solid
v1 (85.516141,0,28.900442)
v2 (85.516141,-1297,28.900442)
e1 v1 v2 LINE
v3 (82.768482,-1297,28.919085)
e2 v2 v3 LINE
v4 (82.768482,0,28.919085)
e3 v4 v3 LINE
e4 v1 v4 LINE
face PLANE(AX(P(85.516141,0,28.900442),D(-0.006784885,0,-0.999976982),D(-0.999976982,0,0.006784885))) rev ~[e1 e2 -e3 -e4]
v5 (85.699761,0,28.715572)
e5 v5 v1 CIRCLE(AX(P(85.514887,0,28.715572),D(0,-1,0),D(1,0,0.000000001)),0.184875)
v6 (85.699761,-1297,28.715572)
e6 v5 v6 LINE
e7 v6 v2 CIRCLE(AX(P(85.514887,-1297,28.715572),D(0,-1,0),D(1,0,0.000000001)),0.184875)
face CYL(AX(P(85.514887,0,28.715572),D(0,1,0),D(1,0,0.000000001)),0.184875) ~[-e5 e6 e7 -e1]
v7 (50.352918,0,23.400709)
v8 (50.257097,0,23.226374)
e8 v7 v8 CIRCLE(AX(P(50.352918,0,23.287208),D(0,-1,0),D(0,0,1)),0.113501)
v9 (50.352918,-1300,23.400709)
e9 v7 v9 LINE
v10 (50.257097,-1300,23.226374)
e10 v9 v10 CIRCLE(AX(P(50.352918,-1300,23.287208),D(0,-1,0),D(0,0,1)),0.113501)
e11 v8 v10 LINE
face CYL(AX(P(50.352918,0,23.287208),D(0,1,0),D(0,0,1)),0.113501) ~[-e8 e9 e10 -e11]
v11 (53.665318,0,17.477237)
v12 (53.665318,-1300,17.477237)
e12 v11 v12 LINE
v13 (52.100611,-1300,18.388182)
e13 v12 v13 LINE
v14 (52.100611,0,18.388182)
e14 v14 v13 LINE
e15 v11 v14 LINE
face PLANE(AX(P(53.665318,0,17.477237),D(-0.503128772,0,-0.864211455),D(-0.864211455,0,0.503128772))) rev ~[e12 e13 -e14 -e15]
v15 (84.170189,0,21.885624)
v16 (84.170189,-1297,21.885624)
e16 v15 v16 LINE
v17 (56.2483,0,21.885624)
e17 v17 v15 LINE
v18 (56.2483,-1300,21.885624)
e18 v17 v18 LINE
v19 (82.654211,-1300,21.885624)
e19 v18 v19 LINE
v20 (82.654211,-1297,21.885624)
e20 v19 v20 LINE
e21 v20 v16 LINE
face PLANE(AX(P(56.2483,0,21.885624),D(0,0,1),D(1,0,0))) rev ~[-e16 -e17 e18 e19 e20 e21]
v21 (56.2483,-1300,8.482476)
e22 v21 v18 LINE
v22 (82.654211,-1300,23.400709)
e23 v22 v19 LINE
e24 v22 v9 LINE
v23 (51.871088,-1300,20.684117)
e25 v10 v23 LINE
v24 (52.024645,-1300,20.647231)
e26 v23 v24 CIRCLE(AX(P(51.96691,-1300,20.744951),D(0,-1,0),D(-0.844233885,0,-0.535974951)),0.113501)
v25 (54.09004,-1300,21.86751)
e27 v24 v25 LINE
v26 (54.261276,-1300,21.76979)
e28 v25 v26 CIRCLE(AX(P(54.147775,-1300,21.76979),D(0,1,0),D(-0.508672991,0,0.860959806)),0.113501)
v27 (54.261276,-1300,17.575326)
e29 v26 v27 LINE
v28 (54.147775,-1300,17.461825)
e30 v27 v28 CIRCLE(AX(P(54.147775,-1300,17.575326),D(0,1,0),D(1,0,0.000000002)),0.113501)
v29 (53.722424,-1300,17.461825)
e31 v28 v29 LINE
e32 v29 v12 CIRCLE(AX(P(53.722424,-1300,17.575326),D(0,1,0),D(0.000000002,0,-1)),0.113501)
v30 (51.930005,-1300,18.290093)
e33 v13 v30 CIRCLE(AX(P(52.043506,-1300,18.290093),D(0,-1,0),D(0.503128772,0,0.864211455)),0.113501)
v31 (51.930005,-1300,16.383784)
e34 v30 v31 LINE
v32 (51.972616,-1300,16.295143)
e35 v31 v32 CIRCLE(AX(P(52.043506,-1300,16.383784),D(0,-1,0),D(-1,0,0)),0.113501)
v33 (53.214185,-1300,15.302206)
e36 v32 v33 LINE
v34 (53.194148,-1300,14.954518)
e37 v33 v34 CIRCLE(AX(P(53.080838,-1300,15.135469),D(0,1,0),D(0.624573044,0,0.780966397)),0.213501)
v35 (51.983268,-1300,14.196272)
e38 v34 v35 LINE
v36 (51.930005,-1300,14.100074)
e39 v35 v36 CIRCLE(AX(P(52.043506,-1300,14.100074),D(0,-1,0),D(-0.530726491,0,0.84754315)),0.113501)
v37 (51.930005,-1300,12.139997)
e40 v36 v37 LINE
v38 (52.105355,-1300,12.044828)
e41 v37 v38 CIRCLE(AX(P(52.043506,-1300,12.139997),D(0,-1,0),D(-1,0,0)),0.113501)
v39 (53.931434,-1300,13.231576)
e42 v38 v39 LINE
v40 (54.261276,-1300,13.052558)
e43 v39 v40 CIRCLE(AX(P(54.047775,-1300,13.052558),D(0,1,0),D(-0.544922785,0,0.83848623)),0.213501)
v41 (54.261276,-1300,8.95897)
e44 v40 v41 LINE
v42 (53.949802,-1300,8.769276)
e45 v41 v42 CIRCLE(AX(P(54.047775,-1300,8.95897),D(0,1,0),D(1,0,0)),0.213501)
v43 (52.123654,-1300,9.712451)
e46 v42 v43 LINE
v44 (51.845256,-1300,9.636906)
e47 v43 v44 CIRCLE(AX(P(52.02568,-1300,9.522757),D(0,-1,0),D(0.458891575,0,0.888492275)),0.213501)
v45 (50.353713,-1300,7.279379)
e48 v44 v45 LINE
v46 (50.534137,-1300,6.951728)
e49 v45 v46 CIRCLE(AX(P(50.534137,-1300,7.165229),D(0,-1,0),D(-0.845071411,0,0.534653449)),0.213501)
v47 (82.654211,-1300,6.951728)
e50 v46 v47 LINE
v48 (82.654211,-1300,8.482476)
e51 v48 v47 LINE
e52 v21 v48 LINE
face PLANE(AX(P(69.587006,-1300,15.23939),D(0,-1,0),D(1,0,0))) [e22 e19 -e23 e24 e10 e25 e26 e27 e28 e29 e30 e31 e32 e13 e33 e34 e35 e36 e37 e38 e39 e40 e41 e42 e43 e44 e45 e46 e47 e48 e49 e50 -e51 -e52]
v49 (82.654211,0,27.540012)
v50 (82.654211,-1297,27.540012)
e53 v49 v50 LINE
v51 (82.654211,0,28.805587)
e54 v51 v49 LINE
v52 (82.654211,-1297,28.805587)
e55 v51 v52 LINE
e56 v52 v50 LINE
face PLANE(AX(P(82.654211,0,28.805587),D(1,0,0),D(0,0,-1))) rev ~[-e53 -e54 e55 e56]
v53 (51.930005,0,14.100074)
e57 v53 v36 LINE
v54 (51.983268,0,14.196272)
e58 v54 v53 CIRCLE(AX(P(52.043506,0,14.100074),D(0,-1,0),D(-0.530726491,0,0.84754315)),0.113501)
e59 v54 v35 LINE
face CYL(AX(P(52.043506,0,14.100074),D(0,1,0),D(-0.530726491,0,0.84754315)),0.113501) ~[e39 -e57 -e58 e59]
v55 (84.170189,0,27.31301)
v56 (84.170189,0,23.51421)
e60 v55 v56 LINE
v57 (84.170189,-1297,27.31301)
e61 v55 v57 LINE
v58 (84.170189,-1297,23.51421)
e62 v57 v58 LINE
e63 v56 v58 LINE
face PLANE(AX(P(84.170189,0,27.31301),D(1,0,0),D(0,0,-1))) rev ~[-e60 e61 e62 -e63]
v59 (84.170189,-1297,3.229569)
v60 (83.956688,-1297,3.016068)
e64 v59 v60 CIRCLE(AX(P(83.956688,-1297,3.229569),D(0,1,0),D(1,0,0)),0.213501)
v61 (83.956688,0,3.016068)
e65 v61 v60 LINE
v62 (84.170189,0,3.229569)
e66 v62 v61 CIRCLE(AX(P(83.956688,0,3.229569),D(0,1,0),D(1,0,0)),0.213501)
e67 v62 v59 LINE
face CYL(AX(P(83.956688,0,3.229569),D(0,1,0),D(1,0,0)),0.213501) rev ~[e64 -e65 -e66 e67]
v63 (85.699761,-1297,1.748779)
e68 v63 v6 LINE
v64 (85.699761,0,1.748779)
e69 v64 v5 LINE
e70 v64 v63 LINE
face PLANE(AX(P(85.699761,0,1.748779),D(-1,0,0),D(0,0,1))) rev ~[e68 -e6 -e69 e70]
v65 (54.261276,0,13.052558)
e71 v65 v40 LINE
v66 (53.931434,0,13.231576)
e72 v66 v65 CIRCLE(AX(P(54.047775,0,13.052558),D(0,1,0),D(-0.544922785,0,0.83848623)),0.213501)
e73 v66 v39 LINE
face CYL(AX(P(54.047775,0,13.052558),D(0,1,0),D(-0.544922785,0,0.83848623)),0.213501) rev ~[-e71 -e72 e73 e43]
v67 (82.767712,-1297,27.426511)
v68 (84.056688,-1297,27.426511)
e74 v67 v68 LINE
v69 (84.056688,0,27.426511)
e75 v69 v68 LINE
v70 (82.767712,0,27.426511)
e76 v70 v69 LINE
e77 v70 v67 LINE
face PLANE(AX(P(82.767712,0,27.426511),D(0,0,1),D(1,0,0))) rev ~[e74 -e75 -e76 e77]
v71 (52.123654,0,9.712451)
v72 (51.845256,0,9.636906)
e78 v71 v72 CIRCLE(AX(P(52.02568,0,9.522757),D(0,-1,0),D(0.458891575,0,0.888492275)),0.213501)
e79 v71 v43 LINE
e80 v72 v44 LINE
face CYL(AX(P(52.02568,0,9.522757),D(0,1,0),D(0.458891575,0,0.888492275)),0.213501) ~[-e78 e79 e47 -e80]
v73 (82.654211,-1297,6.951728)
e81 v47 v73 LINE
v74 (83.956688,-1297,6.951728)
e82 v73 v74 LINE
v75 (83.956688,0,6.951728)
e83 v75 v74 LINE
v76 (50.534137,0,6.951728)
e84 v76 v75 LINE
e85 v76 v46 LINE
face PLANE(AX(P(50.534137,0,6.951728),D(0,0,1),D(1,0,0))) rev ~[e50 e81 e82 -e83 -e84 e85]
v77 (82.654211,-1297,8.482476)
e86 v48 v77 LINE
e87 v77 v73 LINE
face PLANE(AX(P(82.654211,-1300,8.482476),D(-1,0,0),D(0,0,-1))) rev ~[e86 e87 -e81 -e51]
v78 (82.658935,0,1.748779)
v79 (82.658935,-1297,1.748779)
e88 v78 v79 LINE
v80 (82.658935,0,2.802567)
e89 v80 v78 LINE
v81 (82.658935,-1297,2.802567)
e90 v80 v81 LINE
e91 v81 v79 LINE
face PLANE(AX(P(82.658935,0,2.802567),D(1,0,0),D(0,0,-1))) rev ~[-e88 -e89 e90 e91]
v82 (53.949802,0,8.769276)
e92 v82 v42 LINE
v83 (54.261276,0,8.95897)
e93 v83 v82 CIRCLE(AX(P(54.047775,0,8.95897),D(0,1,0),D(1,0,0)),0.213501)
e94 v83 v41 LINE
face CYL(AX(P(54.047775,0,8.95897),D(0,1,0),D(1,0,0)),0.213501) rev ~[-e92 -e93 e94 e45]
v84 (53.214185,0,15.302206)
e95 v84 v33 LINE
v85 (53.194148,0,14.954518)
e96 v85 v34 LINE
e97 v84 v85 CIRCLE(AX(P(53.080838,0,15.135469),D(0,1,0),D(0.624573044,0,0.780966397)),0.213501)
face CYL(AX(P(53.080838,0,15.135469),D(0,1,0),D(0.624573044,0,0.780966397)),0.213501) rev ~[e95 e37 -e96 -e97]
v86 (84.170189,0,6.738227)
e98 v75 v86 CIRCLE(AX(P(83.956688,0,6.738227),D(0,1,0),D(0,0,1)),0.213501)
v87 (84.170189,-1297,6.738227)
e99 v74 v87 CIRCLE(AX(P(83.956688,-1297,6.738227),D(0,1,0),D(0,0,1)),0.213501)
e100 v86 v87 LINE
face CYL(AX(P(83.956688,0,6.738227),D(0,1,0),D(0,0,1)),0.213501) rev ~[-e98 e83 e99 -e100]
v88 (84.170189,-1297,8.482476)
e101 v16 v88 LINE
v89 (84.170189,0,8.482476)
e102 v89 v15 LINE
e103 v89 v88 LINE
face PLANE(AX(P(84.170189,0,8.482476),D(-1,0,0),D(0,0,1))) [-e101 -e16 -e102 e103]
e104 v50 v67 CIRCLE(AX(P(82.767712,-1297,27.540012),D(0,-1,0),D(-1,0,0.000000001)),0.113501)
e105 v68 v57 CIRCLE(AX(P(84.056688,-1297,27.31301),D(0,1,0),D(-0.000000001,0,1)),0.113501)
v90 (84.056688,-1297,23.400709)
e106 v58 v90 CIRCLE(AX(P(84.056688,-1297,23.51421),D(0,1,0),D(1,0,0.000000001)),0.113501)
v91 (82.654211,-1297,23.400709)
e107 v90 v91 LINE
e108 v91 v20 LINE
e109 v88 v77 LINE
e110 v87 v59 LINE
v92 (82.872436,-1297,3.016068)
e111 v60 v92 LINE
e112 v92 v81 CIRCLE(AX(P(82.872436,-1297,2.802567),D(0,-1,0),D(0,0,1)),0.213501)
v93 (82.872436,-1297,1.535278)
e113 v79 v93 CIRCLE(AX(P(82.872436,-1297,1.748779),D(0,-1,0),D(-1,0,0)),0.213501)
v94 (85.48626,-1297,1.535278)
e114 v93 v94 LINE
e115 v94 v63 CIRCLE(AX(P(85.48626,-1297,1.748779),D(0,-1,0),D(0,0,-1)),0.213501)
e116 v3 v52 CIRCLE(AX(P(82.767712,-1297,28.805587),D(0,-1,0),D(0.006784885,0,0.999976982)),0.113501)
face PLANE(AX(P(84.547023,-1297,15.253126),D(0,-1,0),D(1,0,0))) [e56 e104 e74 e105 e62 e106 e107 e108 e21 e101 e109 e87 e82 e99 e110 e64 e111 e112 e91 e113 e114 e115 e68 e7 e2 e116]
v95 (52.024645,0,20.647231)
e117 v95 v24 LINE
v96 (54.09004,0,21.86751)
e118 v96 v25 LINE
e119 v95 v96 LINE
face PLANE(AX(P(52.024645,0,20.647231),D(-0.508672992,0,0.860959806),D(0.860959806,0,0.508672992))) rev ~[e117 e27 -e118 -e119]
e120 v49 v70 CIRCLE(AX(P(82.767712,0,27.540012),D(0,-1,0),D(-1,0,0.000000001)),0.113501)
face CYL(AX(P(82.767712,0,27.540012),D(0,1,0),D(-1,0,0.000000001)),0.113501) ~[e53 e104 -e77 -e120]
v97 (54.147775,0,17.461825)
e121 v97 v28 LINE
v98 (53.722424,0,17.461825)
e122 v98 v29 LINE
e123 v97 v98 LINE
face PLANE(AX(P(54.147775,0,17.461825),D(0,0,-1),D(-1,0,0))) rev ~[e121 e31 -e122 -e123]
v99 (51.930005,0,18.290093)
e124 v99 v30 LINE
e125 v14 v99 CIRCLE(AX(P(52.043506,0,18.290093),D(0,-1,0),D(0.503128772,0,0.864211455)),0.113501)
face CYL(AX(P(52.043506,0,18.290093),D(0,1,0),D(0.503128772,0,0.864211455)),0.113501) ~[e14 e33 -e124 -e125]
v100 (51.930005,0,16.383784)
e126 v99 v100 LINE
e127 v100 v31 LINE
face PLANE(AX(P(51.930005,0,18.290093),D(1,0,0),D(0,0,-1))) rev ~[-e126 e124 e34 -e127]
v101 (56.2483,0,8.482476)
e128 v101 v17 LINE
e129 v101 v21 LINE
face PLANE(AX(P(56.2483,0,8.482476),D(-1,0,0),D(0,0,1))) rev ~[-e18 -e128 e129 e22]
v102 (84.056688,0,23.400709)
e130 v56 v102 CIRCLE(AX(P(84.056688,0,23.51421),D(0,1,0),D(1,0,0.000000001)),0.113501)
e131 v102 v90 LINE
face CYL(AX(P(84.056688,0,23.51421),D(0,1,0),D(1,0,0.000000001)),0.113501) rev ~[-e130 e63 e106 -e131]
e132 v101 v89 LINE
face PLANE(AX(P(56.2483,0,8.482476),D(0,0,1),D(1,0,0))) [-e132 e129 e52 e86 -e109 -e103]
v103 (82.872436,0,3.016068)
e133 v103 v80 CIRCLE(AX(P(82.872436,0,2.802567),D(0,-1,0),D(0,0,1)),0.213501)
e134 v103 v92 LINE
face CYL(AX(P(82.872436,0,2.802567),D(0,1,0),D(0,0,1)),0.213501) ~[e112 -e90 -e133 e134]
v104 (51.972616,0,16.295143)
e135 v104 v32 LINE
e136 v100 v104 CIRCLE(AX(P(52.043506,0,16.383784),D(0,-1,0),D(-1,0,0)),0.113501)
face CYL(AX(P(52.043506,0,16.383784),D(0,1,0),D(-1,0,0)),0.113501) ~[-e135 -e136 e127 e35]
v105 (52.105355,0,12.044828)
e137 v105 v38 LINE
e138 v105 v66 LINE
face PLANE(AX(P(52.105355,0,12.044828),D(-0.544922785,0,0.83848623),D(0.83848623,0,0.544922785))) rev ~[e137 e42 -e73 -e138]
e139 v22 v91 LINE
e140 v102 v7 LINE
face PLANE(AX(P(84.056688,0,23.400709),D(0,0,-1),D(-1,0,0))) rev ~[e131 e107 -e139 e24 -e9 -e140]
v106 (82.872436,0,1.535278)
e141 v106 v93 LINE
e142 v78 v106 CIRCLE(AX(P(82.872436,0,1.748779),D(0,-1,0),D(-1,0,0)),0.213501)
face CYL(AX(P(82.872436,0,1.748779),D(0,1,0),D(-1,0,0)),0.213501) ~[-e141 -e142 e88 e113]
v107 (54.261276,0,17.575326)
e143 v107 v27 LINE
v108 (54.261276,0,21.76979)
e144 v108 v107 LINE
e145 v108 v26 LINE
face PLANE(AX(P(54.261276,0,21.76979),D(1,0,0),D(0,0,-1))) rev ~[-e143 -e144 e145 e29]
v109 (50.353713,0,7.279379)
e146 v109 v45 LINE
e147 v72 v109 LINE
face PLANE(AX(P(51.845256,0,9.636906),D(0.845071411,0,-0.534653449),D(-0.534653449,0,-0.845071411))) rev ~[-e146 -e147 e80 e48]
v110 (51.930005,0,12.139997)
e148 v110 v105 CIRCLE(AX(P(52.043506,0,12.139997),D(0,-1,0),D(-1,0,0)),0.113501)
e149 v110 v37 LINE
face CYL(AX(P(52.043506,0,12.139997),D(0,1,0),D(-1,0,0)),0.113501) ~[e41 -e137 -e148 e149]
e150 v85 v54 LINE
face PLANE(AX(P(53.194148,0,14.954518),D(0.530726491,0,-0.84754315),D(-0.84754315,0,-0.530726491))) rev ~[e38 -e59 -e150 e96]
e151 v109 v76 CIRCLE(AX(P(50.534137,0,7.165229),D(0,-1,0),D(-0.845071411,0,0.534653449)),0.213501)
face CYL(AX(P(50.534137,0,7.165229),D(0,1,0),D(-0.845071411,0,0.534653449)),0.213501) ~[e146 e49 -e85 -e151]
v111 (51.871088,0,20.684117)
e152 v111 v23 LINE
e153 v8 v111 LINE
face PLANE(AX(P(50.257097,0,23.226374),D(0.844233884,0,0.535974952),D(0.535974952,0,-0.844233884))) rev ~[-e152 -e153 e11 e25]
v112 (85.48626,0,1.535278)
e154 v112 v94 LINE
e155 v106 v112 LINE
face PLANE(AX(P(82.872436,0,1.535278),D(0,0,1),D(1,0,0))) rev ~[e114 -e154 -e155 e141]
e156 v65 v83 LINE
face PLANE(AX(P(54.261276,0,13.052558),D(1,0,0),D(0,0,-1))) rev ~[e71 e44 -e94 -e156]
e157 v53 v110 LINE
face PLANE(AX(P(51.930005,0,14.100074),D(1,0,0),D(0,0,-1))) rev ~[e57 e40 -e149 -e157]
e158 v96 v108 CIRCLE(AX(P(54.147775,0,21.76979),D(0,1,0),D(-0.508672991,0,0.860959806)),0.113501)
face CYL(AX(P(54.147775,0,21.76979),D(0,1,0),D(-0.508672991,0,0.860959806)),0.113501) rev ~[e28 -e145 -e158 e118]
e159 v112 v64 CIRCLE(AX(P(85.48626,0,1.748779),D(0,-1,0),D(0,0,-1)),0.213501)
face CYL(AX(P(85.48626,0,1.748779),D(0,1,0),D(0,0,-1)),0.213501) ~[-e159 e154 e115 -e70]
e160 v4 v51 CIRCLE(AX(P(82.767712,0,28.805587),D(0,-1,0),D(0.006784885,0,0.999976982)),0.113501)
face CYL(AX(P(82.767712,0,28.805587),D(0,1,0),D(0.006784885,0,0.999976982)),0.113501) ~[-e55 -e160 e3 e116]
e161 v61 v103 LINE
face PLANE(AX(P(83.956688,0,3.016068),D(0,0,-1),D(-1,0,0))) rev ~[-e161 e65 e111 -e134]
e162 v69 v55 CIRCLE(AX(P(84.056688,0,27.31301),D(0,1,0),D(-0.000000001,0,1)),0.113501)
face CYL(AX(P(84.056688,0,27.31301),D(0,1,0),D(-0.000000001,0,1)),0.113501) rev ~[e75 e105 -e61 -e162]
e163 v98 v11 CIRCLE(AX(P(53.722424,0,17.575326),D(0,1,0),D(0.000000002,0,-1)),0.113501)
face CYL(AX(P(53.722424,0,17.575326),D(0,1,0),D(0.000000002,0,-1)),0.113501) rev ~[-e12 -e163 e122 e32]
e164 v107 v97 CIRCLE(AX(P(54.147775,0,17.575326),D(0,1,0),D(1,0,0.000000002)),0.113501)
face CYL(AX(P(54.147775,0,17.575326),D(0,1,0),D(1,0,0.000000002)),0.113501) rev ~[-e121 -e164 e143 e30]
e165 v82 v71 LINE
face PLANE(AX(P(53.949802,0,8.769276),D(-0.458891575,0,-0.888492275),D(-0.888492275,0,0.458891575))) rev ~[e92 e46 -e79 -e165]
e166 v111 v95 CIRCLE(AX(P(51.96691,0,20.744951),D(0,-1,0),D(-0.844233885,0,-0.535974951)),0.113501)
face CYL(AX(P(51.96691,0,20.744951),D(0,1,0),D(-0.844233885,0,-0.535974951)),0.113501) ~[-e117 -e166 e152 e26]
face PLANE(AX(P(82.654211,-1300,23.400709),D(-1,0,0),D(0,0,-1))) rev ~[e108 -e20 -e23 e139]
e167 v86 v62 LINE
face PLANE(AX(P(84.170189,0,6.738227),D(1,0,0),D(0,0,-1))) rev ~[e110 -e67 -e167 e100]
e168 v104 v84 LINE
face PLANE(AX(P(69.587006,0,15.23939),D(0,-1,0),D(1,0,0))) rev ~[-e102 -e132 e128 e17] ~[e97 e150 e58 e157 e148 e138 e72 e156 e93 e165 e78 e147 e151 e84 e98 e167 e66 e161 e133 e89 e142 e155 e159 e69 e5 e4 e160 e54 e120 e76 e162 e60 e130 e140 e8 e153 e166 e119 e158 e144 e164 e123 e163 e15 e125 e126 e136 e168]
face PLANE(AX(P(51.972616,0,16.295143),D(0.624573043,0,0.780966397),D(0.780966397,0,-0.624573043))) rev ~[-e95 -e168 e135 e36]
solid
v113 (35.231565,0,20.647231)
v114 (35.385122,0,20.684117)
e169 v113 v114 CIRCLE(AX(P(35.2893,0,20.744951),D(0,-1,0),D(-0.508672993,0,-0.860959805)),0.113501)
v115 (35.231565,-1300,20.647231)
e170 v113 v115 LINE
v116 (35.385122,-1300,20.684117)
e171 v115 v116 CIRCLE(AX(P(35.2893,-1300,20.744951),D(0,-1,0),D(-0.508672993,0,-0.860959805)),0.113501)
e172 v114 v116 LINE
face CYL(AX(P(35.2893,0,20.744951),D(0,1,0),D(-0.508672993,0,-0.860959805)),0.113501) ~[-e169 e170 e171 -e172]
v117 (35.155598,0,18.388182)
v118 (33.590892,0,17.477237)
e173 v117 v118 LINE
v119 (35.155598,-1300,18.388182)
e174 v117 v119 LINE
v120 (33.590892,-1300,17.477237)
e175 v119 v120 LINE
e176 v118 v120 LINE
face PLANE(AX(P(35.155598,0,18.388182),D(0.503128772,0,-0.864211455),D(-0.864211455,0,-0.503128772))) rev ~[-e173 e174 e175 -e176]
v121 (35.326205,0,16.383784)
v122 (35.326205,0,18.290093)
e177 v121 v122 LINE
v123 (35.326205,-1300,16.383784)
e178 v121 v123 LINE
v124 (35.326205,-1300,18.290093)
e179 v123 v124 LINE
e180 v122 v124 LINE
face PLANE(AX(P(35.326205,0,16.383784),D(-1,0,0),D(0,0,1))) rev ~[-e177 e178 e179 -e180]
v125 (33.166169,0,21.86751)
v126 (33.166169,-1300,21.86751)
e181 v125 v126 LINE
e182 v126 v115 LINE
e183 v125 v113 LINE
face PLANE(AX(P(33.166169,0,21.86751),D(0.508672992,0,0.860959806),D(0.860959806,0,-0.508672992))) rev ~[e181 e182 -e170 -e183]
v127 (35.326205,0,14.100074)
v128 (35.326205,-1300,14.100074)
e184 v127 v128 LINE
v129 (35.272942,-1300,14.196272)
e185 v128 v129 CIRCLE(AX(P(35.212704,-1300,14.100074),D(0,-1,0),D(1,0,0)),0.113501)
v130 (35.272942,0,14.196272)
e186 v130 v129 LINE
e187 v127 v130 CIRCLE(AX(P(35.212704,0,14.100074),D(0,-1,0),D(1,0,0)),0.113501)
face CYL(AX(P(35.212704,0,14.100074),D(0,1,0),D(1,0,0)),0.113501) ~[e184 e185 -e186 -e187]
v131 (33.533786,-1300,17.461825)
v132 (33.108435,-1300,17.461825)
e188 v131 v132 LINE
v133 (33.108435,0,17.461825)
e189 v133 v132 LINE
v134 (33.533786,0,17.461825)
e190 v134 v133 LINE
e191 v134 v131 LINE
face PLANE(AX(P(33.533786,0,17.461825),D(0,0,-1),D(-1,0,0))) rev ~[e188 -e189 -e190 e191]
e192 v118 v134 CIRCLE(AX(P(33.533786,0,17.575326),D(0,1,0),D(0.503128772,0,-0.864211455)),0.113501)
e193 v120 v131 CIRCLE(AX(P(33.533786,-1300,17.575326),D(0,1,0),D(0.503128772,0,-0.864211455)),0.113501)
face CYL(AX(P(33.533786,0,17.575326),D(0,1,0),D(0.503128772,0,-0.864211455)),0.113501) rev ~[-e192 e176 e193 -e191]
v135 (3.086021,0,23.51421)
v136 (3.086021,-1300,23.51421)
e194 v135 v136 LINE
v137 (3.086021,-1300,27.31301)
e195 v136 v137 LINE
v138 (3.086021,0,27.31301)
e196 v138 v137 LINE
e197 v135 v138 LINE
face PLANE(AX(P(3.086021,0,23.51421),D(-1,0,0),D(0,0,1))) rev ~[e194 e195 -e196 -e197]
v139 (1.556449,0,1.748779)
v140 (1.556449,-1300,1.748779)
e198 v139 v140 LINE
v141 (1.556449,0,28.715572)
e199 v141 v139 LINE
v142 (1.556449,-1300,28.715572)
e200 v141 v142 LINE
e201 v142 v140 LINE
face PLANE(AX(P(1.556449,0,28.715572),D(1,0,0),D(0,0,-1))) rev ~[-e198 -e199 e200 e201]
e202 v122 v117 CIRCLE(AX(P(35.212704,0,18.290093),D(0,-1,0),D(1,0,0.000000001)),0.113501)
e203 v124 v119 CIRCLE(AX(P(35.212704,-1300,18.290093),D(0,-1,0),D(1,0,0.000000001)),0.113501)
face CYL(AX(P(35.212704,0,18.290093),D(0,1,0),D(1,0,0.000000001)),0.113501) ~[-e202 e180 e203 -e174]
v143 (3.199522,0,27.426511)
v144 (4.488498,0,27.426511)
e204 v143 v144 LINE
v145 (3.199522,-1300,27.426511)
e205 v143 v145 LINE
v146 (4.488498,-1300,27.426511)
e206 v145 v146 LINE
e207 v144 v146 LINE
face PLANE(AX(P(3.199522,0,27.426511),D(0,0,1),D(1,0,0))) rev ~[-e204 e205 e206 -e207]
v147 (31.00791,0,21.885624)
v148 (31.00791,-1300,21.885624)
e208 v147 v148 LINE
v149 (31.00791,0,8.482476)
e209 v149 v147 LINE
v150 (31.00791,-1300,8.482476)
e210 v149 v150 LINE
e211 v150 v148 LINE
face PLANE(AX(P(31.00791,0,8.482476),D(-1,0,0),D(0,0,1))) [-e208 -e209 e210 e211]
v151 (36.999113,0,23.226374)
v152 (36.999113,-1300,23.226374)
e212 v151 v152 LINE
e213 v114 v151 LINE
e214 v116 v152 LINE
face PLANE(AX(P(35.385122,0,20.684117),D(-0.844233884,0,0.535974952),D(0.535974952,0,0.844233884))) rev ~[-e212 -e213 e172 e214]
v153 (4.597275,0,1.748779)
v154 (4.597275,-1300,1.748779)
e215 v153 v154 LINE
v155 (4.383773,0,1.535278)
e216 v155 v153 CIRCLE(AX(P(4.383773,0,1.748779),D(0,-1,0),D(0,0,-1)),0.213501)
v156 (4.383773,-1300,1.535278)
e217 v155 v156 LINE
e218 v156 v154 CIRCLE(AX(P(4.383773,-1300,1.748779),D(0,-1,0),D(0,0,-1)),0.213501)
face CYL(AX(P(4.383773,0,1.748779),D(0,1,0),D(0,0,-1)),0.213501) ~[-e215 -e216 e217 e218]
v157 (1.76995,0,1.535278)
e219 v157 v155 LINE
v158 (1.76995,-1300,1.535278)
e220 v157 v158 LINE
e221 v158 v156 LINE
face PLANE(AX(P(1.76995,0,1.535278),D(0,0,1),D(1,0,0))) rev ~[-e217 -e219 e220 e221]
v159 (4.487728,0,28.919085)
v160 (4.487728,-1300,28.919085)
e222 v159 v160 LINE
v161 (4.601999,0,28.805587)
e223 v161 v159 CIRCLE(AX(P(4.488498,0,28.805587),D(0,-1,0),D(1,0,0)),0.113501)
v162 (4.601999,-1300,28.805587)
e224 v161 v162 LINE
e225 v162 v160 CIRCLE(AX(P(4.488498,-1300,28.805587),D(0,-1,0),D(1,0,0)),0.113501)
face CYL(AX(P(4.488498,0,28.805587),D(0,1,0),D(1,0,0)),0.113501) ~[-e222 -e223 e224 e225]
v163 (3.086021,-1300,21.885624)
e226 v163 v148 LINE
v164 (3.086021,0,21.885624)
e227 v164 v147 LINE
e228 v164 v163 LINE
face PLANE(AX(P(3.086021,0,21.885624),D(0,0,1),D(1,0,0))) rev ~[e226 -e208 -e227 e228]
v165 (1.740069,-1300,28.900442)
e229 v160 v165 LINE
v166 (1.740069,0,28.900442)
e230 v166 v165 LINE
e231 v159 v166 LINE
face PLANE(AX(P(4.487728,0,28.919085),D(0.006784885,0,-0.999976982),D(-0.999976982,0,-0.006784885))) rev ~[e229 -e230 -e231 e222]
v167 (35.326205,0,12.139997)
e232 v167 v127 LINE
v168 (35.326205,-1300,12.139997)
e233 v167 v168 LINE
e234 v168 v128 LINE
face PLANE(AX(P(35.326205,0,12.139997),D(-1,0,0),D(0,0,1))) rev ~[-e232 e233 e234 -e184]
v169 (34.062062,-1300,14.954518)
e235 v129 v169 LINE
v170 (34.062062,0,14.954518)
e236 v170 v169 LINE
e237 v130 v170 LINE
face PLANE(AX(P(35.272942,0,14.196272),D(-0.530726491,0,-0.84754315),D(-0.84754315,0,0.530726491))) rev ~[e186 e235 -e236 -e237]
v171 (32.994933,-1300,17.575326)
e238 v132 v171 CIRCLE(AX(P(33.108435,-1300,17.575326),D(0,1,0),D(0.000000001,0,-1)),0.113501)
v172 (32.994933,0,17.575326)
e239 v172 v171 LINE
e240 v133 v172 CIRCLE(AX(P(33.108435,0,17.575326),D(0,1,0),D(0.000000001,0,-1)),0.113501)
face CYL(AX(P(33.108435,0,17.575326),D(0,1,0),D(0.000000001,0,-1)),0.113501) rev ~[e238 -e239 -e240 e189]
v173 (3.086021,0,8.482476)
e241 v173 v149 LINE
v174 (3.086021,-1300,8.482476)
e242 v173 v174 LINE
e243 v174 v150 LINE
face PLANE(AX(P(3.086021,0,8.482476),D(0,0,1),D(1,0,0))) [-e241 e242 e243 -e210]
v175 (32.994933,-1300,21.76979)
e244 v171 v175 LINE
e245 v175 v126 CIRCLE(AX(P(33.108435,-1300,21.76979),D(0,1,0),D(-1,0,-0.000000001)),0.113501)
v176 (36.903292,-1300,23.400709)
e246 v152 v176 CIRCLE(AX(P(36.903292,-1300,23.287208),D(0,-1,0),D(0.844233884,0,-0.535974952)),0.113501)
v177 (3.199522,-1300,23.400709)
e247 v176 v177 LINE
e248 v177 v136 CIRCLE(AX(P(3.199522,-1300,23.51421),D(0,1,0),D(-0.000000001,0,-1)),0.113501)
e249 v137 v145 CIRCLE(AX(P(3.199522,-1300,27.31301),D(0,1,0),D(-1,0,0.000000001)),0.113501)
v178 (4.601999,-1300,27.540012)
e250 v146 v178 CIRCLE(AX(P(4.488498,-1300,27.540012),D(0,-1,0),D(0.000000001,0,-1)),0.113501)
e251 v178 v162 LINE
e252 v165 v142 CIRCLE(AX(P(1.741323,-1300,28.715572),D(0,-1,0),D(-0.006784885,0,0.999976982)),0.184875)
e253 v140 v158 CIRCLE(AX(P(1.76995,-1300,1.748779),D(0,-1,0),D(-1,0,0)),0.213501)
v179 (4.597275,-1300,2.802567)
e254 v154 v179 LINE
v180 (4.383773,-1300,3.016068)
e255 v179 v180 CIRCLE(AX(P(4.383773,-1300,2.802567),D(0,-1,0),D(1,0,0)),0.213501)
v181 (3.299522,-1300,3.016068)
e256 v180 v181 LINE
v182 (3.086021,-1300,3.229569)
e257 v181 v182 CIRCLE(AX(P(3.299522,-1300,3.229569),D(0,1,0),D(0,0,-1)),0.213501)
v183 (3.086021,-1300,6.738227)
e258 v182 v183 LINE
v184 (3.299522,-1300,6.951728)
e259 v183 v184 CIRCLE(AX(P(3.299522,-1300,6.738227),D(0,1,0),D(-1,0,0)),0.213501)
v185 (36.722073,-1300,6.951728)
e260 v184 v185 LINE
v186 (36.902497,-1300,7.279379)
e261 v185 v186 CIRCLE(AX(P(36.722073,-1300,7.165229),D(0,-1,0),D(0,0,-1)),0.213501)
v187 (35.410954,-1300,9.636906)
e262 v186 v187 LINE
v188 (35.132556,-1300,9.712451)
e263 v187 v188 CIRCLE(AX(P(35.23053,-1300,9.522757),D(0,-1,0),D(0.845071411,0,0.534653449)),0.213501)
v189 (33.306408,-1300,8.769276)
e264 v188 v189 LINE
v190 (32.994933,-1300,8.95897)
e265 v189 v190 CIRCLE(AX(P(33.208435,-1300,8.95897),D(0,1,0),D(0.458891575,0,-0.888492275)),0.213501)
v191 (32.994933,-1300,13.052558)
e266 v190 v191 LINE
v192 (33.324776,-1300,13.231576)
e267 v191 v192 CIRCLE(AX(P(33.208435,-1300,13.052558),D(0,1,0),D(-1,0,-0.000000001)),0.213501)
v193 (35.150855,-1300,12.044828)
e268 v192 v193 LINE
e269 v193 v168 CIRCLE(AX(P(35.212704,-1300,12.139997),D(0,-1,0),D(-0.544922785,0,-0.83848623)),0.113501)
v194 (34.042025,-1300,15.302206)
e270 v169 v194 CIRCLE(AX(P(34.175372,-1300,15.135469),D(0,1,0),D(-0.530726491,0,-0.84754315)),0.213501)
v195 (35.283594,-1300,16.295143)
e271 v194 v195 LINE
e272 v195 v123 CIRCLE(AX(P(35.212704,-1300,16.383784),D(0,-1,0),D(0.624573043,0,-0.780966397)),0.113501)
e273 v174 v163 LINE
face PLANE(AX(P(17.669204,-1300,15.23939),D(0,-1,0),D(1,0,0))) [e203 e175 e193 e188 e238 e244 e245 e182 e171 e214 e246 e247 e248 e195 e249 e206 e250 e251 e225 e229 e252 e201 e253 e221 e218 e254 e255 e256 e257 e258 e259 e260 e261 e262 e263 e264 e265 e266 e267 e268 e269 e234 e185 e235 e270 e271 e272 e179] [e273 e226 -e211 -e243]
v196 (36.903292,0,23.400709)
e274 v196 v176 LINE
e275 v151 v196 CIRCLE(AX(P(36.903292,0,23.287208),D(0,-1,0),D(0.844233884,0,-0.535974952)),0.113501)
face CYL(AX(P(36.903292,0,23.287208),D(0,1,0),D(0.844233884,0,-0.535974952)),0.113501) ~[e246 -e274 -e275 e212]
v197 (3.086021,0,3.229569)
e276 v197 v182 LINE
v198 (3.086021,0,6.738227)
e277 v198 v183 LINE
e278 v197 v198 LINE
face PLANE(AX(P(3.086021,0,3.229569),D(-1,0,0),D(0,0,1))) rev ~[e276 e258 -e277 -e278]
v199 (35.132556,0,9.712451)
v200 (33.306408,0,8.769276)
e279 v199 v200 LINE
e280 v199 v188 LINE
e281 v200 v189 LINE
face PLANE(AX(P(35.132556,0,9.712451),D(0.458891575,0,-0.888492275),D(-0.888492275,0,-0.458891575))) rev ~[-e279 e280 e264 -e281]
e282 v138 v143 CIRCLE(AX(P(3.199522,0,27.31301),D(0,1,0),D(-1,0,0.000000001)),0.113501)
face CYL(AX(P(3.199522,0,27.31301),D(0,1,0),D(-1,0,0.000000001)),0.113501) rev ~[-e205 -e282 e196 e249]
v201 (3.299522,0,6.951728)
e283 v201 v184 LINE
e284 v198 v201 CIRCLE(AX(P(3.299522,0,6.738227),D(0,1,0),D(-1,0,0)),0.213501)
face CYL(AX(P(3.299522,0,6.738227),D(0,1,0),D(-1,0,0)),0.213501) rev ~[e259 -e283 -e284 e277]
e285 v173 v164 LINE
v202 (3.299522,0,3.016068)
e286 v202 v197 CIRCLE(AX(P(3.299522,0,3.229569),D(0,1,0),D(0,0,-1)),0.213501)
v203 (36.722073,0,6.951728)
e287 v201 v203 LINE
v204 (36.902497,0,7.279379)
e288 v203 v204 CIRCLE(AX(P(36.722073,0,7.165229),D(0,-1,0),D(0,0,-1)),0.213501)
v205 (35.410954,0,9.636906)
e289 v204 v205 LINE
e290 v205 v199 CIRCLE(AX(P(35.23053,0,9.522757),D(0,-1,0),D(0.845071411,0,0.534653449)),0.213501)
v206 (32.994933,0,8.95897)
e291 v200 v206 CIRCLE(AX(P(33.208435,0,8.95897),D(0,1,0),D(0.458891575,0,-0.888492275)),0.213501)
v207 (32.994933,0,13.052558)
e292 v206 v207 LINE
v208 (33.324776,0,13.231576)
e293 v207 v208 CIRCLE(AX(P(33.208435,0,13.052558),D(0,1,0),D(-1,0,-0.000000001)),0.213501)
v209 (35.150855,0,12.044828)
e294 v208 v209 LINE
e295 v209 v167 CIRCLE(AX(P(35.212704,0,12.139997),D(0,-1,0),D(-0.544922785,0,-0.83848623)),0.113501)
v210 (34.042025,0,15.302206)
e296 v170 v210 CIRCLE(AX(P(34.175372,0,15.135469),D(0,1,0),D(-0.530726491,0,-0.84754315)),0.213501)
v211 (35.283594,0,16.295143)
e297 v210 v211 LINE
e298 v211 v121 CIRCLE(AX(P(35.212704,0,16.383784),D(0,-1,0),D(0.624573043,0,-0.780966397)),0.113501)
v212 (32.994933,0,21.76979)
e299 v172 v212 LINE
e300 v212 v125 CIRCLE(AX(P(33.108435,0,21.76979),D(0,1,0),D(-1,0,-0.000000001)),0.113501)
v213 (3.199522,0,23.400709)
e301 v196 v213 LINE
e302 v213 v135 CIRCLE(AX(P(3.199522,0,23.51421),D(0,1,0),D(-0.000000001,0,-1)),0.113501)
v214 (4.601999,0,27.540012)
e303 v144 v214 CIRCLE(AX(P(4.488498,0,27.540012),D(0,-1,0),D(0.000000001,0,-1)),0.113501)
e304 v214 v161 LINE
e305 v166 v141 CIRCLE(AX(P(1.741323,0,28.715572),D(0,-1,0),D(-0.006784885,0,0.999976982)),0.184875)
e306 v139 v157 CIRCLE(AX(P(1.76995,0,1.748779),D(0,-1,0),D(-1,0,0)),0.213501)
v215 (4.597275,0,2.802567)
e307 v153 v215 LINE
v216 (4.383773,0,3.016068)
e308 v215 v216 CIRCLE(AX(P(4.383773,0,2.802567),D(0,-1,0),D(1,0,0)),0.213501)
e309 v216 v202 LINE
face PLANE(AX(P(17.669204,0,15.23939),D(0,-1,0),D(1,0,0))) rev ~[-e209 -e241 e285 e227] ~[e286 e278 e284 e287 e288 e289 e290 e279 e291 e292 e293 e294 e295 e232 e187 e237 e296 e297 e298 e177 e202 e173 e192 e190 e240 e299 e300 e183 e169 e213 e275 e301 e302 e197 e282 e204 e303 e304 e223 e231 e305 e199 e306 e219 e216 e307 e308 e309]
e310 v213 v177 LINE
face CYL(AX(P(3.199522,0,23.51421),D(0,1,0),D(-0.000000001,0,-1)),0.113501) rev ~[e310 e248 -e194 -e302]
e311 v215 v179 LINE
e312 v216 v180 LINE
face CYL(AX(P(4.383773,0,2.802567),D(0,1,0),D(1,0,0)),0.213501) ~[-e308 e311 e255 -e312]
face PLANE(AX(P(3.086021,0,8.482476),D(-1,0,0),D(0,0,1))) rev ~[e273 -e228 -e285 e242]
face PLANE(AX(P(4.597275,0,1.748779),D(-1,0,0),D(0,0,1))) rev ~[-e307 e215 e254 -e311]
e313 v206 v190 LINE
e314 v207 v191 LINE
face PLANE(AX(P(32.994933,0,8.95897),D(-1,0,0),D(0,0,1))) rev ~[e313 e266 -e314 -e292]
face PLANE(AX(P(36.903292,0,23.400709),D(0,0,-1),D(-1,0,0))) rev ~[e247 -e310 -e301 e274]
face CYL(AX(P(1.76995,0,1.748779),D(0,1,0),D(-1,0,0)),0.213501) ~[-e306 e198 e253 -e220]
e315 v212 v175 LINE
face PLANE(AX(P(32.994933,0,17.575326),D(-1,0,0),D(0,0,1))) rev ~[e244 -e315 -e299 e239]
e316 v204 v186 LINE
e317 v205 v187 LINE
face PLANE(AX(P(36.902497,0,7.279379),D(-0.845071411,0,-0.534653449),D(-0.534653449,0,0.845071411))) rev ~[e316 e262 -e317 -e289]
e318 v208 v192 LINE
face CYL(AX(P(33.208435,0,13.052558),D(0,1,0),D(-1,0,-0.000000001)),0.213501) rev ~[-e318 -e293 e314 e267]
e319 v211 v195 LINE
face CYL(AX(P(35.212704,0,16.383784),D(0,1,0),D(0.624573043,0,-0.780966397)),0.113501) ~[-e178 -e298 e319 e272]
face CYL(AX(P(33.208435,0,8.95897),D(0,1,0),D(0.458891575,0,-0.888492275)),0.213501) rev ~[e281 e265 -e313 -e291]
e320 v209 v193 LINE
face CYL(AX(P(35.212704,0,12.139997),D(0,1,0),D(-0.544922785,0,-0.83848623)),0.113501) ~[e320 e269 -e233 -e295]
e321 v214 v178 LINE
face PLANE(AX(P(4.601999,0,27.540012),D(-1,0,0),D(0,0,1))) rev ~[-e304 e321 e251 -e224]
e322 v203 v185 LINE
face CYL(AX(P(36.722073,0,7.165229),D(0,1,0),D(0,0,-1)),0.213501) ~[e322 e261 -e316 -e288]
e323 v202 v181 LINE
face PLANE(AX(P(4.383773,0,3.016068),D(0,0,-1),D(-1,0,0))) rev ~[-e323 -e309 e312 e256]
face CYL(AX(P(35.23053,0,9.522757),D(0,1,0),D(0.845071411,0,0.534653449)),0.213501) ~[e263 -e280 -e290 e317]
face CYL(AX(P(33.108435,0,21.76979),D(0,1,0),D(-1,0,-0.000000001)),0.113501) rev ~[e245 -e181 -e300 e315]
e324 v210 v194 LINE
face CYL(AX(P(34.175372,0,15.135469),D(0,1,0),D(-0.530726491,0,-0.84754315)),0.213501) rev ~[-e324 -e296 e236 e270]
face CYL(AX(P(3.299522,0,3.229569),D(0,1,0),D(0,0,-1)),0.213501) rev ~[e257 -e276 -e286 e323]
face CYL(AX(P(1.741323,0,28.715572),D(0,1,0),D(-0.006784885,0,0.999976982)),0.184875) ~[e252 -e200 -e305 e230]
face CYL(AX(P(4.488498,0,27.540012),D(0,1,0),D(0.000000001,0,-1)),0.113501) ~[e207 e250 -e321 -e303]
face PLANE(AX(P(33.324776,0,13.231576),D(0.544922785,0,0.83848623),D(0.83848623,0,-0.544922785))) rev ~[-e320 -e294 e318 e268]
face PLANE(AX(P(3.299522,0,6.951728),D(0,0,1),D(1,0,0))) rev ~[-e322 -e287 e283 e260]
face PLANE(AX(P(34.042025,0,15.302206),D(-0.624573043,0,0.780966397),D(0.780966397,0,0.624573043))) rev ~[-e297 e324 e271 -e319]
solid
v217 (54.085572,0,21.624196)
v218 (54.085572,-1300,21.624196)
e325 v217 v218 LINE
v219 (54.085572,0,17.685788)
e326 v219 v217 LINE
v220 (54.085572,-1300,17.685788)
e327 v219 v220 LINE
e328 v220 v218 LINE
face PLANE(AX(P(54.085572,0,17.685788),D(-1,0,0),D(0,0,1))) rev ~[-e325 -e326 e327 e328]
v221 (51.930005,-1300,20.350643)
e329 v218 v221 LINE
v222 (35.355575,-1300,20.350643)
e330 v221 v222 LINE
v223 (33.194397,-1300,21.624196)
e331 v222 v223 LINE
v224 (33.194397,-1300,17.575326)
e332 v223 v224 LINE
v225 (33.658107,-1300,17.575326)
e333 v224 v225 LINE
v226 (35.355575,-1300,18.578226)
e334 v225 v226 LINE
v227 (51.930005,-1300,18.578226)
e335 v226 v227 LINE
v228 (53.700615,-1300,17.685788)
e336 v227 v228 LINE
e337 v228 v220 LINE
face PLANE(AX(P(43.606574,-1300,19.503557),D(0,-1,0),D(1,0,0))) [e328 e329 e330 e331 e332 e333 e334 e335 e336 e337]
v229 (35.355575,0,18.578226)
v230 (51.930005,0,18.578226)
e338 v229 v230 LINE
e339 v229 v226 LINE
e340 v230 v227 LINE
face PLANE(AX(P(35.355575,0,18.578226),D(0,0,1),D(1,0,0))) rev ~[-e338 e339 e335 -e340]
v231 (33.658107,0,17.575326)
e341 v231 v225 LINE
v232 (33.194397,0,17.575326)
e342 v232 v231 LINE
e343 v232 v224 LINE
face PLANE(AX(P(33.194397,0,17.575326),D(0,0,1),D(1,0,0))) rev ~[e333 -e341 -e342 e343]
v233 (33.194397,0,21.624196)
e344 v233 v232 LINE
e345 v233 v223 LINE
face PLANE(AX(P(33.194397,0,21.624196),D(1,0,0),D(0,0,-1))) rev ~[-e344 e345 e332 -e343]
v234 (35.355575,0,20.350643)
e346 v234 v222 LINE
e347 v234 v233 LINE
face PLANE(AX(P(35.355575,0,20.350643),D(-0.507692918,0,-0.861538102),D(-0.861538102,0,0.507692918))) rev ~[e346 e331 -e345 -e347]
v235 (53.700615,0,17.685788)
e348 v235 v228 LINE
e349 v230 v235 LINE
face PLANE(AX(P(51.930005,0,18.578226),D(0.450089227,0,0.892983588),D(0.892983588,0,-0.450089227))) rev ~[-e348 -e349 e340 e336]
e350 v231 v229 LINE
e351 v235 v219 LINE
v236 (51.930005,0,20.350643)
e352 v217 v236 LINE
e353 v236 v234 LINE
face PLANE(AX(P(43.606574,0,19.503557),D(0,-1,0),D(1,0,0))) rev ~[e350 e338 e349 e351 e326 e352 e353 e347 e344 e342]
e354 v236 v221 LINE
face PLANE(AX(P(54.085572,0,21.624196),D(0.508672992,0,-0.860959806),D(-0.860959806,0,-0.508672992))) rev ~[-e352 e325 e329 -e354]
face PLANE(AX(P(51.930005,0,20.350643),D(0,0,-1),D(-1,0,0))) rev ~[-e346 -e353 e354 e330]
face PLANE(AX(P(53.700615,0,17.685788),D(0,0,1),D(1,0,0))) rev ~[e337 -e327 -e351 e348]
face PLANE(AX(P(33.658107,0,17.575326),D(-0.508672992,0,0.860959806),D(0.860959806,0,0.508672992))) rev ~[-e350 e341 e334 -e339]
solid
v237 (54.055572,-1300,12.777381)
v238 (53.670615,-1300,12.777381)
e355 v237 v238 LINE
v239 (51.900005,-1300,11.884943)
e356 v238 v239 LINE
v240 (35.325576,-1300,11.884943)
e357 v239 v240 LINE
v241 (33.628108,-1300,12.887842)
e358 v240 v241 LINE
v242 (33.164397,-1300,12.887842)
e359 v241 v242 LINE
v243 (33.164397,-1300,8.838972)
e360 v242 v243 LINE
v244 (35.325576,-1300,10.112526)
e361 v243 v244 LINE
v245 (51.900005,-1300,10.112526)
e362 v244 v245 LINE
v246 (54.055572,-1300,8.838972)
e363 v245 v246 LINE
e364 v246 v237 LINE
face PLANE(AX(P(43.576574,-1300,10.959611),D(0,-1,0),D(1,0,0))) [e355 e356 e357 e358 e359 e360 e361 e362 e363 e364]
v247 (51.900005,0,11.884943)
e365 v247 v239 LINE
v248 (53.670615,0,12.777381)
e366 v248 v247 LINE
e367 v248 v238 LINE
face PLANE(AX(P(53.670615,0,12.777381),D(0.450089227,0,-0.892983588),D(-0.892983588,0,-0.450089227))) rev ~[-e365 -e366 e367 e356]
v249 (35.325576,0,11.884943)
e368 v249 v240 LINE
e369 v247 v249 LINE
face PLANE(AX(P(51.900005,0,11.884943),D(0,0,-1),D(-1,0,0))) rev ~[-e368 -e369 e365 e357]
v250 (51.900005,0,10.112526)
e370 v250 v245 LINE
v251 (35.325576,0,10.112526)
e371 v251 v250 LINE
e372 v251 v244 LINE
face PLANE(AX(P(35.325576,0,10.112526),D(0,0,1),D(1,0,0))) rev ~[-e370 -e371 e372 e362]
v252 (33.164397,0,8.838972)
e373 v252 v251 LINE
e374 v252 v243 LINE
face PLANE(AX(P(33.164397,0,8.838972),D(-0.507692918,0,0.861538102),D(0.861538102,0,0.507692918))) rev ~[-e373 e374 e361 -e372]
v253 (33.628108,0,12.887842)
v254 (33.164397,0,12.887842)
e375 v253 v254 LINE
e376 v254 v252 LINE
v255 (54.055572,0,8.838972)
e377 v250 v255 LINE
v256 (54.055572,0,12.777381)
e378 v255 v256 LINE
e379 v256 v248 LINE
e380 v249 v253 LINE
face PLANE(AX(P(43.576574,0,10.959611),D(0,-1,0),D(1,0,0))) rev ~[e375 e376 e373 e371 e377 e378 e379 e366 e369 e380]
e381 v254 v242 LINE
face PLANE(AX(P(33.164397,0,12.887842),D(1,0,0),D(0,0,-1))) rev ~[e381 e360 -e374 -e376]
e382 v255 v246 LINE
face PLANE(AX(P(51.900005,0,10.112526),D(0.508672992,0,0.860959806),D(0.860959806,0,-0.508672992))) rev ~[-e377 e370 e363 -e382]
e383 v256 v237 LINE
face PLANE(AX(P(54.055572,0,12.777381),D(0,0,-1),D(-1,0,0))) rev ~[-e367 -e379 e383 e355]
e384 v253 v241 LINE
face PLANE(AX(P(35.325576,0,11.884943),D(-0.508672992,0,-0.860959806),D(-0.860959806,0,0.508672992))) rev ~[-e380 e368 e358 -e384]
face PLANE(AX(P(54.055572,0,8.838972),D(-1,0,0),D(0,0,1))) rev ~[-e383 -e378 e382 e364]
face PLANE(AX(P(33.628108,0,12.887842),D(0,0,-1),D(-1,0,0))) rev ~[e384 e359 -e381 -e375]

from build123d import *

# Parameters (mm, degrees)
F1_DEPTH = 1300
F0_W     = 27.9218892101
F0_H     = 13.4031483904
F3_DEPTH = 3


with BuildPart() as f1:
    # F0 (on Front) → F1 (new body)
    with BuildSketch(Plane.XZ):
        Polygon((33.1643968821, 8.8389720768), (35.3255756199, 10.1125258952), (51.900004968, 10.1125258952), (54.0555718382, 8.8389720768), (54.0555718382, 12.7773806453), (53.6706149578, 12.7773806453), (51.900004968, 11.8849426508), (35.3255756199, 11.8849426508), (33.6281075799, 12.8878421359), (33.1643968821, 12.8878421359), align=None)
    extrude(amount=F1_DEPTH)


with BuildPart() as f1b:
    # F0 (on Front) → F1, piece 2 (new body)
    with BuildSketch(Plane.XZ):
        with BuildLine():
            ThreePointArc((1.7400689467, 28.9004424067), (1.610154442, 28.8458538917), (1.5564486384, 28.7155720005))
            Line((1.5564486384, 28.7155720005), (1.5564486384, 1.7487789137))
            ThreePointArc((1.5564486384, 1.7487789137), (1.6189816628, 1.5978108381), (1.7699497384, 1.5352778137))
            Line((1.7699497384, 1.5352778137), (4.3837734866, 1.5352778137))
            ThreePointArc((4.3837734866, 1.5352778137), (4.5347415622, 1.5978108381), (4.5972745866, 1.7487789137))
            Line((4.5972745866, 1.7487789137), (4.5972745866, 2.8025670345))
            ThreePointArc((4.5972745866, 2.8025670345), (4.5347415622, 2.9535351101), (4.3837734866, 3.0160681345))
            Line((4.3837734866, 3.0160681345), (3.2995220372, 3.0160681345))
            ThreePointArc((3.2995220372, 3.0160681345), (3.1485539616, 3.0786011589), (3.0860209372, 3.2295692345))
            Line((3.0860209372, 3.2295692345), (3.0860209372, 6.73822727))
            ThreePointArc((3.0860209372, 6.73822727), (3.1485539616, 6.8891953456), (3.2995220372, 6.95172837))
            Line((3.2995220372, 6.95172837), (36.7220732833, 6.95172837))
            ThreePointArc((36.7220732833, 6.95172837), (36.909094242, 7.0622446134), (36.9024969591, 7.2793785695))
            Line((36.9024969591, 7.2793785695), (35.4109538688, 9.6369064715))
            ThreePointArc((35.4109538688, 9.6369064715), (35.2864431086, 9.7288070398), (35.1325563369, 9.7124514501))
            Line((35.1325563369, 9.7124514501), (33.3064083824, 8.7692762138))
            ThreePointArc((33.3064083824, 8.7692762138), (33.0973823007, 8.7766241296), (32.9949334264, 8.9589702918))
            Line((32.9949334264, 8.9589702918), (32.9949334264, 13.052558215))
            ThreePointArc((32.9949334264, 13.052558215), (33.1065923516, 13.2402038682), (33.3247761404, 13.2315759475))
            Line((33.3247761404, 13.2315759475), (35.1508547592, 12.0448279597))
            ThreePointArc((35.1508547592, 12.0448279597), (35.266845262, 12.0402411989), (35.326205194, 12.1399970688))
            Line((35.326205194, 12.1399970688), (35.326205194, 14.1000744849))
            ThreePointArc((35.326205194, 14.1000744849), (35.3120005783, 14.1550536436), (35.2729421347, 14.1962715644))
            Line((35.2729421347, 14.1962715644), (34.0620617039, 14.954517704))
            ThreePointArc((34.0620617039, 14.954517704), (33.9622249211, 15.1231859929), (34.0420253617, 15.3022062838))
            Line((34.0420253617, 15.3022062838), (35.2835938216, 16.2951429765))
            ThreePointArc((35.2835938216, 16.2951429765), (35.3149991617, 16.334608133), (35.326205194, 16.3837835213))
            Line((35.326205194, 16.3837835213), (35.326205194, 18.2900932618))
            ThreePointArc((35.326205194, 18.2900932618), (35.2692768061, 18.3884905579), (35.1555984257, 18.3881822121))
            Line((35.1555984257, 18.3881822121), (33.5908916097, 17.4772373113))
            ThreePointArc((33.5908916097, 17.4772373113), (33.5633603883, 17.4657459183), (33.5337859409, 17.4618251622))
            Line((33.5337859409, 17.4618251622), (33.1084345259, 17.4618251622))
            ThreePointArc((33.1084345259, 17.4618251622), (33.0281771288, 17.4950688645), (32.9949334264, 17.5753262617))
            Line((32.9949334264, 17.5753262617), (32.9949334264, 21.7697896372))
            ThreePointArc((32.9949334264, 21.7697896372), (33.0521783263, 21.8683682333), (33.1661694697, 21.8675095219))
            Line((33.1661694697, 21.8675095219), (35.2315651953, 20.6472306944))
            ThreePointArc((35.2315651953, 20.6472306944), (35.3158103776, 20.6345888698), (35.3851216132, 20.6841168326))
            Line((35.3851216132, 20.6841168326), (36.9991130564, 23.2263741871))
            ThreePointArc((36.9991130564, 23.2263741871), (37.0027581513, 23.341878778), (36.9032915823, 23.400709033))
            Line((36.9032915823, 23.400709033), (3.1995220367, 23.400709033))
            ThreePointArc((3.1995220367, 23.400709033), (3.1192646396, 23.4339527354), (3.0860209372, 23.5142101325))
            Line((3.0860209372, 23.5142101325), (3.0860209372, 27.3130099498))
            ThreePointArc((3.0860209372, 27.3130099498), (3.1192646396, 27.3932673469), (3.1995220367, 27.4265110493))
            Line((3.1995220367, 27.4265110493), (4.4884980865, 27.4265110493))
            ThreePointArc((4.4884980865, 27.4265110493), (4.5687554836, 27.4597547517), (4.601999186, 27.5400121488))
            Line((4.601999186, 27.5400121488), (4.601999186, 28.8055868989))
            ThreePointArc((4.601999186, 28.8055868989), (4.5684827516, 28.8861161044), (4.4877279946, 28.9190853859))
            Line((4.4877279946, 28.9190853859), (1.7400689467, 28.9004424067))
        make_face()
        with Locations((17.0469655422, 15.1840499602)):
            Rectangle(F0_W, F0_H, mode=Mode.SUBTRACT)
    extrude(amount=F1_DEPTH)


with BuildPart() as f1c:
    # F0 (on Front) → F1, piece 3 (new body)
    with BuildSketch(Plane.XZ):
        with BuildLine():
            Line((54.1477753989, 17.4618251622), (53.7224239839, 17.4618251622))
            ThreePointArc((53.7224239839, 17.4618251622), (53.6928495365, 17.4657459183), (53.6653183151, 17.4772373113))
            Line((53.6653183151, 17.4772373113), (52.1006114991, 18.3881822121))
            ThreePointArc((52.1006114991, 18.3881822121), (51.9869331187, 18.3884905579), (51.9300047308, 18.2900932618))
            Line((51.9300047308, 18.2900932618), (51.9300047308, 16.3837835213))
            ThreePointArc((51.9300047308, 16.3837835213), (51.9412107631, 16.334608133), (51.9726161032, 16.2951429765))
            Line((51.9726161032, 16.2951429765), (53.2141845631, 15.3022062838))
            ThreePointArc((53.2141845631, 15.3022062838), (53.2939850037, 15.1231859929), (53.1941482209, 14.954517704))
            Line((53.1941482209, 14.954517704), (51.9832677901, 14.1962715644))
            ThreePointArc((51.9832677901, 14.1962715644), (51.9442093465, 14.1550536436), (51.9300047308, 14.1000744849))
            Line((51.9300047308, 14.1000744849), (51.9300047308, 12.1399970688))
            ThreePointArc((51.9300047308, 12.1399970688), (51.9893646628, 12.0402411989), (52.1053551656, 12.0448279597))
            Line((52.1053551656, 12.0448279597), (53.9314337844, 13.2315759475))
            ThreePointArc((53.9314337844, 13.2315759475), (54.1496175732, 13.2402038682), (54.2612764984, 13.052558215))
            Line((54.2612764984, 13.052558215), (54.2612764984, 8.9589702918))
            ThreePointArc((54.2612764984, 8.9589702918), (54.1588276241, 8.7766241296), (53.9498015424, 8.7692762138))
            Line((53.9498015424, 8.7692762138), (52.1236535879, 9.7124514501))
            ThreePointArc((52.1236535879, 9.7124514501), (51.9697668162, 9.7288070398), (51.845256056, 9.6369064715))
            Line((51.845256056, 9.6369064715), (50.3537129657, 7.2793785695))
            ThreePointArc((50.3537129657, 7.2793785695), (50.3471156828, 7.0622446134), (50.5341366415, 6.95172837))
            Line((50.5341366415, 6.95172837), (83.9566878876, 6.95172837))
            ThreePointArc((83.9566878876, 6.95172837), (84.1076559632, 6.8891953456), (84.1701889876, 6.73822727))
            Line((84.1701889876, 6.73822727), (84.1701889876, 3.2295692345))
            ThreePointArc((84.1701889876, 3.2295692345), (84.1076559632, 3.0786011589), (83.9566878876, 3.0160681345))
            Line((83.9566878876, 3.0160681345), (82.8724364383, 3.0160681345))
            ThreePointArc((82.8724364383, 3.0160681345), (82.7214683627, 2.9535351101), (82.6589353383, 2.8025670345))
            Line((82.6589353383, 2.8025670345), (82.6589353383, 1.7487789137))
            ThreePointArc((82.6589353383, 1.7487789137), (82.7214683627, 1.5978108381), (82.8724364383, 1.5352778137))
            Line((82.8724364383, 1.5352778137), (85.4862601864, 1.5352778137))
            ThreePointArc((85.4862601864, 1.5352778137), (85.637228262, 1.5978108381), (85.6997612864, 1.7487789137))
            Line((85.6997612864, 1.7487789137), (85.6997612864, 28.7155720005))
            ThreePointArc((85.6997612864, 28.7155720005), (85.6460554828, 28.8458538917), (85.5161409781, 28.9004424067))
            Line((85.5161409781, 28.9004424067), (82.7684819302, 28.9190853859))
            ThreePointArc((82.7684819302, 28.9190853859), (82.6877271732, 28.8861161044), (82.6542107388, 28.8055868989))
            Line((82.6542107388, 28.8055868989), (82.6542107388, 27.5400121488))
            ThreePointArc((82.6542107388, 27.5400121488), (82.6874544412, 27.4597547516), (82.7677118384, 27.4265110493))
            Line((82.7677118384, 27.4265110493), (84.0566878881, 27.4265110493))
            ThreePointArc((84.0566878881, 27.4265110493), (84.1369452853, 27.3932673469), (84.1701889876, 27.3130099498))
            Line((84.1701889876, 27.3130099498), (84.1701889876, 23.5142101325))
            ThreePointArc((84.1701889876, 23.5142101325), (84.1369452853, 23.4339527354), (84.0566878881, 23.400709033))
            Line((84.0566878881, 23.400709033), (50.3529183425, 23.400709033))
            ThreePointArc((50.3529183425, 23.400709033), (50.2534517735, 23.341878778), (50.2570968685, 23.2263741871))
            Line((50.2570968685, 23.2263741871), (51.8710883117, 20.6841168326))
            ThreePointArc((51.8710883117, 20.6841168326), (51.9403995472, 20.6345888698), (52.0246447296, 20.6472306944))
            Line((52.0246447296, 20.6472306944), (54.0900404551, 21.8675095219))
            ThreePointArc((54.0900404551, 21.8675095219), (54.2040315985, 21.8683682333), (54.2612764984, 21.7697896372))
            Line((54.2612764984, 21.7697896372), (54.2612764984, 17.5753262617))
            ThreePointArc((54.2612764984, 17.5753262617), (54.2280327961, 17.4950688645), (54.1477753989, 17.4618251622))
        make_face()
        with Locations((70.2092443826, 15.1840499602)):
            Rectangle(F0_W, F0_H, mode=Mode.SUBTRACT)
    extrude(amount=F1_DEPTH)

    # F2 (on face) → F3 (cut)
    with BuildSketch(Plane.XZ.offset(1300)):
        with BuildLine():
            Line((84.0566878881, 23.400709033), (82.6542107388, 23.400709033))
            Line((82.6542107388, 23.400709033), (82.6542107388, 21.8856241554))
            Line((82.6542107388, 21.8856241554), (84.1701889876, 21.8856241554))
            Line((84.1701889876, 21.8856241554), (84.1701889876, 8.482475765))
            Line((84.1701889876, 8.482475765), (82.6542107388, 8.482475765))
            Line((82.6542107388, 8.482475765), (82.6542107388, 6.95172837))
            Line((82.6542107388, 6.95172837), (83.9566878876, 6.95172837))
            ThreePointArc((83.9566878876, 6.95172837), (84.1076559632, 6.8891953456), (84.1701889876, 6.73822727))
            Line((84.1701889876, 6.73822727), (84.1701889876, 3.2295692345))
            ThreePointArc((84.1701889876, 3.2295692345), (84.1076559632, 3.0786011589), (83.9566878876, 3.0160681345))
            Line((83.9566878876, 3.0160681345), (82.8724364383, 3.0160681345))
            ThreePointArc((82.8724364383, 3.0160681345), (82.7214683627, 2.9535351101), (82.6589353383, 2.8025670345))
            Line((82.6589353383, 2.8025670345), (82.6589353383, 1.7487789137))
            ThreePointArc((82.6589353383, 1.7487789137), (82.7214683627, 1.5978108381), (82.8724364383, 1.5352778137))
            Line((82.8724364383, 1.5352778137), (85.4862601864, 1.5352778137))
            ThreePointArc((85.4862601864, 1.5352778137), (85.637228262, 1.5978108381), (85.6997612864, 1.7487789137))
            Line((85.6997612864, 1.7487789137), (85.6997612864, 28.7155720005))
            ThreePointArc((85.6997612864, 28.7155720005), (85.6460554828, 28.8458538917), (85.5161409781, 28.9004424067))
            Line((85.5161409781, 28.9004424067), (82.7684819302, 28.9190853859))
            ThreePointArc((82.7684819302, 28.9190853859), (82.6877271732, 28.8861161044), (82.6542107388, 28.8055868989))
            Line((82.6542107388, 28.8055868989), (82.6542107388, 27.5400121488))
            ThreePointArc((82.6542107388, 27.5400121488), (82.6874544412, 27.4597547516), (82.7677118384, 27.4265110493))
            Line((82.7677118384, 27.4265110493), (84.0566878881, 27.4265110493))
            ThreePointArc((84.0566878881, 27.4265110493), (84.1369452853, 27.3932673469), (84.1701889876, 27.3130099498))
            Line((84.1701889876, 27.3130099498), (84.1701889876, 23.5142101325))
            ThreePointArc((84.1701889876, 23.5142101325), (84.1369452853, 23.4339527354), (84.0566878881, 23.400709033))
        make_face()
    extrude(amount=-F3_DEPTH, mode=Mode.SUBTRACT)


with BuildPart() as f1d:
    # F0 (on Front) → F1, piece 4 (new body)
    with BuildSketch(Plane.XZ):
        Polygon((35.3555753827, 20.3506425023), (33.1943966448, 21.6241963208), (33.1943966448, 17.5753262617), (33.6581073427, 17.5753262617), (35.3555753827, 18.5782257468), (51.9300047308, 18.5782257468), (53.7006147206, 17.6857877523), (54.0855716009, 17.6857877523), (54.0855716009, 21.6241963208), (51.9300047308, 20.3506425023), align=None)
    extrude(amount=F1_DEPTH)


solid = Compound([f1.part, f1b.part, f1c.part, f1d.part])
